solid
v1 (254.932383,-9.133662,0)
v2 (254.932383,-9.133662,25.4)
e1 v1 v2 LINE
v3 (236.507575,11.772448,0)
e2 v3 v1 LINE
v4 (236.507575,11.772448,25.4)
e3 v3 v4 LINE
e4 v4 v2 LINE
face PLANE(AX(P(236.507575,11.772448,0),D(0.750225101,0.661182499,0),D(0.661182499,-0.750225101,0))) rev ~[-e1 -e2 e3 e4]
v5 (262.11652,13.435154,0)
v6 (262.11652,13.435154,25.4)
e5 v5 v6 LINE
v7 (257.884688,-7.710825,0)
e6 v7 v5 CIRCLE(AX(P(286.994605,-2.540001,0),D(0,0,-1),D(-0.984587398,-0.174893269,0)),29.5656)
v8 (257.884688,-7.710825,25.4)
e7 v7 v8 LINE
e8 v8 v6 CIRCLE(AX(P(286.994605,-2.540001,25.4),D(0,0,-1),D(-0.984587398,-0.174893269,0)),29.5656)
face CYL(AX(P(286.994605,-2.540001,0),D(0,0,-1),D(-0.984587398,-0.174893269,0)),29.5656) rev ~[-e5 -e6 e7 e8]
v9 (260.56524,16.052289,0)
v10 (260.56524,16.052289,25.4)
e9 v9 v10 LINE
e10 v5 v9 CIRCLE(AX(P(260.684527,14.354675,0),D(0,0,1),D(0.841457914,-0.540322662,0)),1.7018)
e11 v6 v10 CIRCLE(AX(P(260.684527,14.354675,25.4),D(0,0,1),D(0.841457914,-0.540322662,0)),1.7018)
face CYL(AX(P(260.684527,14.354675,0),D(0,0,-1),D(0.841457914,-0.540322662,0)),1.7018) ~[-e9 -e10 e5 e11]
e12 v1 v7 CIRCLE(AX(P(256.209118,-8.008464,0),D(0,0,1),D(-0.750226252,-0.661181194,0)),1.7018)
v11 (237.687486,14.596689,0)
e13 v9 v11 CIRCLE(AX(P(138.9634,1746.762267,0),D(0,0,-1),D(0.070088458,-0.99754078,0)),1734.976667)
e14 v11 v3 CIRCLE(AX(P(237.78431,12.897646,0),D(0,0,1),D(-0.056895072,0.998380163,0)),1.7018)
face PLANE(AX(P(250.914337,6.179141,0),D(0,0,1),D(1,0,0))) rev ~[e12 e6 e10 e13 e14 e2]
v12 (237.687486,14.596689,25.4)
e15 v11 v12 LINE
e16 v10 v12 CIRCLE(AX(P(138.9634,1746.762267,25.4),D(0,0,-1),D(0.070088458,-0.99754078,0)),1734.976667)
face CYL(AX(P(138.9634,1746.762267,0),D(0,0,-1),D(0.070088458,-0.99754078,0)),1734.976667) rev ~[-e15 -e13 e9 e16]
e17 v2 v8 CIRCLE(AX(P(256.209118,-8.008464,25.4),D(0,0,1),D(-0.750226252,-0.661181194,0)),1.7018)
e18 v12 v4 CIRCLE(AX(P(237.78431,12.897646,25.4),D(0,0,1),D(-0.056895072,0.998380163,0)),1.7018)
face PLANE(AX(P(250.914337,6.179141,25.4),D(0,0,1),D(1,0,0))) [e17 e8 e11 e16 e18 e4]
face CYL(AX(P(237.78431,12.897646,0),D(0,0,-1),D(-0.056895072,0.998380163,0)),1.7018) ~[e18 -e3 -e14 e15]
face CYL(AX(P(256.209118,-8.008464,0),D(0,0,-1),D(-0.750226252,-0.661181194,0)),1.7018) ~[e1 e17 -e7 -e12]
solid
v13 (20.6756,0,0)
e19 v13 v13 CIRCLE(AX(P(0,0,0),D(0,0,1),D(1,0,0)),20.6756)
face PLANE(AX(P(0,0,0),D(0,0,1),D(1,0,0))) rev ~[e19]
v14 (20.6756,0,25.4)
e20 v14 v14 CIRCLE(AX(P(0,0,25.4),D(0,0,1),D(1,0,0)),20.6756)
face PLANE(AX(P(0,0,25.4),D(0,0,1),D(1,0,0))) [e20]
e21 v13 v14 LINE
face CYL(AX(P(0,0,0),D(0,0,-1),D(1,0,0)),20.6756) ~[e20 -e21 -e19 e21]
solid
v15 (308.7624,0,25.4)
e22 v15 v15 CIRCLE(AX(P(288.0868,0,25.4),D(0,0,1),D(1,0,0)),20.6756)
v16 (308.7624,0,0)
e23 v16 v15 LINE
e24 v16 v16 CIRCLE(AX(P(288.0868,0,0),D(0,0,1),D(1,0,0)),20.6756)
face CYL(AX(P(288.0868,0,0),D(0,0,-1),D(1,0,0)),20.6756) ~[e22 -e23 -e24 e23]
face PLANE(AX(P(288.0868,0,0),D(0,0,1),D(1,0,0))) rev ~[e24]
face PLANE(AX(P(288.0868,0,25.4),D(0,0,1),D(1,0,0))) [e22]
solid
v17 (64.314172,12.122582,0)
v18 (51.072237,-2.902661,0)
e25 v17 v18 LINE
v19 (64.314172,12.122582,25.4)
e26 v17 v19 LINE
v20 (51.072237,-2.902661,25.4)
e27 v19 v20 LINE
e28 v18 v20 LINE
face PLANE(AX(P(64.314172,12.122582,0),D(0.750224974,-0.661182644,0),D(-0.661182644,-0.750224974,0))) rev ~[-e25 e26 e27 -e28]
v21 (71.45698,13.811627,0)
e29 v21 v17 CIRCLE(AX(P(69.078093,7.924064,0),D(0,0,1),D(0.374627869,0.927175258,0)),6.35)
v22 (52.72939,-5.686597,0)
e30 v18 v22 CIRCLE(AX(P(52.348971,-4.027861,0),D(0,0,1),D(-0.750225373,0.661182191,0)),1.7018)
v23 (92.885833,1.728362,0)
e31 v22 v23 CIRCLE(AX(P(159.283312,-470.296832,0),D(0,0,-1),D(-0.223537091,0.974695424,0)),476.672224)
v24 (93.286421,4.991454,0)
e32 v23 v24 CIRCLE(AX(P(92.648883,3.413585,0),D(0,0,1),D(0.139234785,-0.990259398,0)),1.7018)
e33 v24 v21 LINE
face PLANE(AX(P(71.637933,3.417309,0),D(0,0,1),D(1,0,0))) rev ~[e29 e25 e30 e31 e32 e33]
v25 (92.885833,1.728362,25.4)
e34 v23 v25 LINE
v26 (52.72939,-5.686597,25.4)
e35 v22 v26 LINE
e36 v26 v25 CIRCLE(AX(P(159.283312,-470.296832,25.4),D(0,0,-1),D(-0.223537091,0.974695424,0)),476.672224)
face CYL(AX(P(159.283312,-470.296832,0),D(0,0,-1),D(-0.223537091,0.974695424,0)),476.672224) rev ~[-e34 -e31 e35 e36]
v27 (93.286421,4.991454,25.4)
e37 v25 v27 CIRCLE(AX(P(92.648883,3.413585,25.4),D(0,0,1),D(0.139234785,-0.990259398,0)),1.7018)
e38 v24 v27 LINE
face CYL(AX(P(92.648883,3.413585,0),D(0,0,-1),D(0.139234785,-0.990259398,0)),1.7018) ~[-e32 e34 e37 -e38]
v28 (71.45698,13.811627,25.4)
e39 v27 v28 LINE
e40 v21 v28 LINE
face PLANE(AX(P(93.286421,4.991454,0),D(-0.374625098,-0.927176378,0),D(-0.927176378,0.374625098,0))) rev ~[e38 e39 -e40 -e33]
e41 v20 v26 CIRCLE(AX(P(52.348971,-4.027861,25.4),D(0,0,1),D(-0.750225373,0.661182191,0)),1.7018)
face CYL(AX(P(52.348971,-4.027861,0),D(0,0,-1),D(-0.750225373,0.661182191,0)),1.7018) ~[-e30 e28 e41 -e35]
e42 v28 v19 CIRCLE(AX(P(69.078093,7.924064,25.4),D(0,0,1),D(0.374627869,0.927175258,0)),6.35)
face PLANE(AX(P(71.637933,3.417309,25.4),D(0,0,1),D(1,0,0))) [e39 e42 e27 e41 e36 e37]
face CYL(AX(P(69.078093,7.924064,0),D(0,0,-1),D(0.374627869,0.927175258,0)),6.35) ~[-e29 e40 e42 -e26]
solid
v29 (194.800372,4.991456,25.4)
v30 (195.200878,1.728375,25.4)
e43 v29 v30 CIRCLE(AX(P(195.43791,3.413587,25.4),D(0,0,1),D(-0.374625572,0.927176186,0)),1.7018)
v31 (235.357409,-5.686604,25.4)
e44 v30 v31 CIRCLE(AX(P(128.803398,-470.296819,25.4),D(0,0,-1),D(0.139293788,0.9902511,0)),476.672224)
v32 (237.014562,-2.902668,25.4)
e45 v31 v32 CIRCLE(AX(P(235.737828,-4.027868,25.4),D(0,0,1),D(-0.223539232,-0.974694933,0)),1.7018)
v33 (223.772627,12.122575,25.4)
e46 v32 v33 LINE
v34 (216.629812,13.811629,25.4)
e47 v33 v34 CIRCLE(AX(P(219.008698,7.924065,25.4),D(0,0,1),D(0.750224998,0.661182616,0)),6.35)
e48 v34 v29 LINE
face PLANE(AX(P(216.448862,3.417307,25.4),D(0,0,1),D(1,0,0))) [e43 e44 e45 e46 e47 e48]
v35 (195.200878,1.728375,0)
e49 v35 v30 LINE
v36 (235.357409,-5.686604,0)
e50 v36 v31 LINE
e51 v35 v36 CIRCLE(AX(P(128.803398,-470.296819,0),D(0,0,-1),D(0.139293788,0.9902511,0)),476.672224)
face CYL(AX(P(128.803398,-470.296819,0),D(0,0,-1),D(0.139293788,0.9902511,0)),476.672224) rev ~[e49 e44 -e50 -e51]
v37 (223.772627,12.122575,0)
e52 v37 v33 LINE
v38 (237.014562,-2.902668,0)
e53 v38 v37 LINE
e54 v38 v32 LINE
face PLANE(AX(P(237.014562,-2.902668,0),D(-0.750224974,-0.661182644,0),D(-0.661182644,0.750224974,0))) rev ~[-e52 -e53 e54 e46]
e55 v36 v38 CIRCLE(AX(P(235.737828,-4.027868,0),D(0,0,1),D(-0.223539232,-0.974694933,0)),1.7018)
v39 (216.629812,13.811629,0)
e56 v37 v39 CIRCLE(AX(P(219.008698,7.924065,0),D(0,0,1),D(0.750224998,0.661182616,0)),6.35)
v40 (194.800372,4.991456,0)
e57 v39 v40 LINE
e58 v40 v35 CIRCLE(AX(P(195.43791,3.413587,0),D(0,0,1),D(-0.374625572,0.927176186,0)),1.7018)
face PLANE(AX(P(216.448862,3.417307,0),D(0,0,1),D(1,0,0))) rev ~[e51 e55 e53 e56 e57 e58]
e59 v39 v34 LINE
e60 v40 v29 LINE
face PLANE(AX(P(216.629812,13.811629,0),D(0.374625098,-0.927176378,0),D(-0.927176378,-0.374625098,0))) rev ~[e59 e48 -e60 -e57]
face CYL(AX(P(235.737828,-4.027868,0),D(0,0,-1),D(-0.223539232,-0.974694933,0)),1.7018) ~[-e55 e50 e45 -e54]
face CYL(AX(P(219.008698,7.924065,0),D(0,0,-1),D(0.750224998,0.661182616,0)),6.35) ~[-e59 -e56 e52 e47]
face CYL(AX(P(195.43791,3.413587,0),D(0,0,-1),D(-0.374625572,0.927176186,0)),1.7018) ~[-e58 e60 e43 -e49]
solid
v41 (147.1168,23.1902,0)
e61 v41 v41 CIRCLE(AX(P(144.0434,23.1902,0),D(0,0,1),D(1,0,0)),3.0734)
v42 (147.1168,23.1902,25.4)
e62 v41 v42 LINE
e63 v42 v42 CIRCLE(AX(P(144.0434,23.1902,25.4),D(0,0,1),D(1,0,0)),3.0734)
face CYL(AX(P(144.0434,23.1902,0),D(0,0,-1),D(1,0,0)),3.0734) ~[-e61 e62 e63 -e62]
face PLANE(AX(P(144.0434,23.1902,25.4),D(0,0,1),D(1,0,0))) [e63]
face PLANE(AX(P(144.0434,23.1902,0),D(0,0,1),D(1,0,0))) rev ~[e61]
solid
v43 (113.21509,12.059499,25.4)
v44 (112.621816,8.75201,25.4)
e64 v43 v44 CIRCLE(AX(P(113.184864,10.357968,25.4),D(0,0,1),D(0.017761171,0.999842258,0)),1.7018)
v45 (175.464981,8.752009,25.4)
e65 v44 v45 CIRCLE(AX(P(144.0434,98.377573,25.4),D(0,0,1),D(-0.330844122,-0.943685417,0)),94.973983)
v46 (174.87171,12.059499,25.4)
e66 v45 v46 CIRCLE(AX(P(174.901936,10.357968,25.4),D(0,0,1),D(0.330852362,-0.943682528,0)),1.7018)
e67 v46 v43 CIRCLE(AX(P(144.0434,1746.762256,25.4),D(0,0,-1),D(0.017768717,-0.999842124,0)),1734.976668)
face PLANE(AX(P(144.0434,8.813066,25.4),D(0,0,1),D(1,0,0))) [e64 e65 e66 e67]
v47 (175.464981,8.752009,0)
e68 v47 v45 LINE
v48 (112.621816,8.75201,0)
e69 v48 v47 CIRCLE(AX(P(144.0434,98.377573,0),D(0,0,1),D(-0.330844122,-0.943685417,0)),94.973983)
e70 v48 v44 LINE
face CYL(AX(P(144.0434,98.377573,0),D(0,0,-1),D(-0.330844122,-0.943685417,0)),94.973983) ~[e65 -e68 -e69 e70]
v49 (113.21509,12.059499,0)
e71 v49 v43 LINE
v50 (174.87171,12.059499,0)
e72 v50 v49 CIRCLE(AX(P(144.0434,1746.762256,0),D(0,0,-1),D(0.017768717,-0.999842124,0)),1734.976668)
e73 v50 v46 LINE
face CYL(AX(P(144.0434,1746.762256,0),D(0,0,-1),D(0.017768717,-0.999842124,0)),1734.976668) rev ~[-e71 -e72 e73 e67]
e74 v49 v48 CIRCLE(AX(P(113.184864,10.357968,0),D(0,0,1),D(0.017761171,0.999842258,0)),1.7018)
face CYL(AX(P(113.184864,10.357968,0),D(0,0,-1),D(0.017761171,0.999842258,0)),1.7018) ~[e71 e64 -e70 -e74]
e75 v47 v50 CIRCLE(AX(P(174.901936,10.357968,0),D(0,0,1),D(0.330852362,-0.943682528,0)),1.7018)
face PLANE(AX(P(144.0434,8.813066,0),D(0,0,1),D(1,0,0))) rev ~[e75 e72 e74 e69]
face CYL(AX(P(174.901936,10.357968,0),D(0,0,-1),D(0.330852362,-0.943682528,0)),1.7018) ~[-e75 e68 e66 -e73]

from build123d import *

# Parameters (mm, degrees)
F0_R     = 20.6756
F1_DEPTH = 25.4
F0_R_2   = 3.0734


# Not quite as in the source:
# - ends of sketch curves that miss each other by under 0.0002 mm in the source are joined
# - a feature of the source that left no trace in its solid (it failed there, or was rolled back) is left out


with BuildPart() as f1:
    # F0 (on Top) → F1 (new body)
    with BuildSketch(Plane.XY):
        Circle(F0_R)
    extrude(amount=F1_DEPTH)


with BuildPart() as f1b:
    # F0 (on Top) → F1, piece 2 (new body)
    with BuildSketch(Plane.XY):
        with Locations((288.0868, 0)):
            Circle(F0_R)
    extrude(amount=F1_DEPTH)


with BuildPart() as f1c:
    # F0 (on Top) → F1, piece 3 (new body)
    with BuildSketch(Plane.XY):
        with BuildLine():
            Line((64.3141716, 12.1225818), (51.0722372, -2.9026612))
            ThreePointArc((51.0722372, -2.9026612), (50.886637197, -4.8983229131), (52.7293898046, -5.6865968893))
            ThreePointArc((52.7293898046, -5.6865968893), (72.7281380064, -1.5489138472), (92.885832563, 1.728361878))
            ThreePointArc((92.885832563, 1.728361878), (94.3380072647, 3.2062647833), (93.2864207732, 4.9914536905))
            Line((93.2864207732, 4.9914536905), (71.4569801787, 13.8116269873))
            ThreePointArc((71.4569801787, 13.8116269873), (67.6168206872, 14.1036419642), (64.3141716, 12.1225818))
        make_face()
    extrude(amount=F1_DEPTH)


with BuildPart() as f1d:
    # F0 (on Top) → F1, piece 4 (new body)
    with BuildSketch(Plane.XY):
        with BuildLine():
            ThreePointArc((235.3574089318, -5.6866037007), (237.2001615394, -4.8983297245), (237.0145615364, -2.9026680114))
            Line((237.0145615364, -2.9026680114), (223.7726271364, 12.1225749886))
            ThreePointArc((223.7726271364, 12.1225749886), (220.4699709207, 14.1036432413), (216.6298123513, 13.8116286368))
            Line((216.6298123513, 13.8116286368), (194.8003724, 4.9914556))
            ThreePointArc((194.8003724, 4.9914556), (193.7487857413, 3.2062666252), (195.2008776796, 1.7283753619))
            ThreePointArc((195.2008776796, 1.7283753619), (215.3585722363, -1.5489003634), (235.3574089318, -5.6866037007))
        make_face()
    extrude(amount=F1_DEPTH)


with BuildPart() as f1e:
    # F0 (on Top) → F1, piece 5 (new body)
    with BuildSketch(Plane.XY):
        with BuildLine():
            ThreePointArc((260.5652400713, 16.0522893388), (249.1287669286, 15.2867037282), (237.6874855708, 14.596689118))
            ThreePointArc((237.6874855708, 14.596689118), (236.2140385559, 13.5536732496), (236.5075745699, 11.7724475997))
            Line((236.5075745699, 11.7724475997), (254.9323832, -9.1336622))
            ThreePointArc((254.9323832, -9.1336622), (256.947957492, -9.5415132252), (257.8846881323, -7.7108254055))
            ThreePointArc((257.8846881323, -7.7108254055), (258.0038440306, 3.2617628688), (262.1165200814, 13.4351540637))
            ThreePointArc((262.1165200814, 13.4351540637), (262.1484797054, 15.2224111463), (260.5652400713, 16.0522893388))
        make_face()
    extrude(amount=F1_DEPTH)


with BuildPart() as f1f:
    # F0 (on Top) → F1, piece 6 (new body)
    with BuildSketch(Plane.XY):
        with BuildLine():
            ThreePointArc((174.8717102393, 12.0594991546), (144.0434, 11.7855877651), (113.2150897607, 12.0594991546))
            ThreePointArc((113.2150897607, 12.0594991546), (111.5097977558, 10.6584288913), (112.6218159145, 8.7520098426))
            ThreePointArc((112.6218159145, 8.7520098426), (144.0434, 3.403589621), (175.4649807504, 8.7520086732))
            ThreePointArc((175.4649807504, 8.7520086732), (176.5770022442, 10.6584288913), (174.8717102393, 12.0594991546))
        make_face()
    extrude(amount=F1_DEPTH)


with BuildPart() as f1g:
    # F0 (on Top) → F1, piece 7 (new body)
    with BuildSketch(Plane.XY):
        with Locations((144.0434, 23.1902)):
            Circle(F0_R_2)
    extrude(amount=F1_DEPTH)


solid = Compound([f1.part, f1b.part, f1c.part, f1d.part, f1e.part, f1f.part, f1g.part])
